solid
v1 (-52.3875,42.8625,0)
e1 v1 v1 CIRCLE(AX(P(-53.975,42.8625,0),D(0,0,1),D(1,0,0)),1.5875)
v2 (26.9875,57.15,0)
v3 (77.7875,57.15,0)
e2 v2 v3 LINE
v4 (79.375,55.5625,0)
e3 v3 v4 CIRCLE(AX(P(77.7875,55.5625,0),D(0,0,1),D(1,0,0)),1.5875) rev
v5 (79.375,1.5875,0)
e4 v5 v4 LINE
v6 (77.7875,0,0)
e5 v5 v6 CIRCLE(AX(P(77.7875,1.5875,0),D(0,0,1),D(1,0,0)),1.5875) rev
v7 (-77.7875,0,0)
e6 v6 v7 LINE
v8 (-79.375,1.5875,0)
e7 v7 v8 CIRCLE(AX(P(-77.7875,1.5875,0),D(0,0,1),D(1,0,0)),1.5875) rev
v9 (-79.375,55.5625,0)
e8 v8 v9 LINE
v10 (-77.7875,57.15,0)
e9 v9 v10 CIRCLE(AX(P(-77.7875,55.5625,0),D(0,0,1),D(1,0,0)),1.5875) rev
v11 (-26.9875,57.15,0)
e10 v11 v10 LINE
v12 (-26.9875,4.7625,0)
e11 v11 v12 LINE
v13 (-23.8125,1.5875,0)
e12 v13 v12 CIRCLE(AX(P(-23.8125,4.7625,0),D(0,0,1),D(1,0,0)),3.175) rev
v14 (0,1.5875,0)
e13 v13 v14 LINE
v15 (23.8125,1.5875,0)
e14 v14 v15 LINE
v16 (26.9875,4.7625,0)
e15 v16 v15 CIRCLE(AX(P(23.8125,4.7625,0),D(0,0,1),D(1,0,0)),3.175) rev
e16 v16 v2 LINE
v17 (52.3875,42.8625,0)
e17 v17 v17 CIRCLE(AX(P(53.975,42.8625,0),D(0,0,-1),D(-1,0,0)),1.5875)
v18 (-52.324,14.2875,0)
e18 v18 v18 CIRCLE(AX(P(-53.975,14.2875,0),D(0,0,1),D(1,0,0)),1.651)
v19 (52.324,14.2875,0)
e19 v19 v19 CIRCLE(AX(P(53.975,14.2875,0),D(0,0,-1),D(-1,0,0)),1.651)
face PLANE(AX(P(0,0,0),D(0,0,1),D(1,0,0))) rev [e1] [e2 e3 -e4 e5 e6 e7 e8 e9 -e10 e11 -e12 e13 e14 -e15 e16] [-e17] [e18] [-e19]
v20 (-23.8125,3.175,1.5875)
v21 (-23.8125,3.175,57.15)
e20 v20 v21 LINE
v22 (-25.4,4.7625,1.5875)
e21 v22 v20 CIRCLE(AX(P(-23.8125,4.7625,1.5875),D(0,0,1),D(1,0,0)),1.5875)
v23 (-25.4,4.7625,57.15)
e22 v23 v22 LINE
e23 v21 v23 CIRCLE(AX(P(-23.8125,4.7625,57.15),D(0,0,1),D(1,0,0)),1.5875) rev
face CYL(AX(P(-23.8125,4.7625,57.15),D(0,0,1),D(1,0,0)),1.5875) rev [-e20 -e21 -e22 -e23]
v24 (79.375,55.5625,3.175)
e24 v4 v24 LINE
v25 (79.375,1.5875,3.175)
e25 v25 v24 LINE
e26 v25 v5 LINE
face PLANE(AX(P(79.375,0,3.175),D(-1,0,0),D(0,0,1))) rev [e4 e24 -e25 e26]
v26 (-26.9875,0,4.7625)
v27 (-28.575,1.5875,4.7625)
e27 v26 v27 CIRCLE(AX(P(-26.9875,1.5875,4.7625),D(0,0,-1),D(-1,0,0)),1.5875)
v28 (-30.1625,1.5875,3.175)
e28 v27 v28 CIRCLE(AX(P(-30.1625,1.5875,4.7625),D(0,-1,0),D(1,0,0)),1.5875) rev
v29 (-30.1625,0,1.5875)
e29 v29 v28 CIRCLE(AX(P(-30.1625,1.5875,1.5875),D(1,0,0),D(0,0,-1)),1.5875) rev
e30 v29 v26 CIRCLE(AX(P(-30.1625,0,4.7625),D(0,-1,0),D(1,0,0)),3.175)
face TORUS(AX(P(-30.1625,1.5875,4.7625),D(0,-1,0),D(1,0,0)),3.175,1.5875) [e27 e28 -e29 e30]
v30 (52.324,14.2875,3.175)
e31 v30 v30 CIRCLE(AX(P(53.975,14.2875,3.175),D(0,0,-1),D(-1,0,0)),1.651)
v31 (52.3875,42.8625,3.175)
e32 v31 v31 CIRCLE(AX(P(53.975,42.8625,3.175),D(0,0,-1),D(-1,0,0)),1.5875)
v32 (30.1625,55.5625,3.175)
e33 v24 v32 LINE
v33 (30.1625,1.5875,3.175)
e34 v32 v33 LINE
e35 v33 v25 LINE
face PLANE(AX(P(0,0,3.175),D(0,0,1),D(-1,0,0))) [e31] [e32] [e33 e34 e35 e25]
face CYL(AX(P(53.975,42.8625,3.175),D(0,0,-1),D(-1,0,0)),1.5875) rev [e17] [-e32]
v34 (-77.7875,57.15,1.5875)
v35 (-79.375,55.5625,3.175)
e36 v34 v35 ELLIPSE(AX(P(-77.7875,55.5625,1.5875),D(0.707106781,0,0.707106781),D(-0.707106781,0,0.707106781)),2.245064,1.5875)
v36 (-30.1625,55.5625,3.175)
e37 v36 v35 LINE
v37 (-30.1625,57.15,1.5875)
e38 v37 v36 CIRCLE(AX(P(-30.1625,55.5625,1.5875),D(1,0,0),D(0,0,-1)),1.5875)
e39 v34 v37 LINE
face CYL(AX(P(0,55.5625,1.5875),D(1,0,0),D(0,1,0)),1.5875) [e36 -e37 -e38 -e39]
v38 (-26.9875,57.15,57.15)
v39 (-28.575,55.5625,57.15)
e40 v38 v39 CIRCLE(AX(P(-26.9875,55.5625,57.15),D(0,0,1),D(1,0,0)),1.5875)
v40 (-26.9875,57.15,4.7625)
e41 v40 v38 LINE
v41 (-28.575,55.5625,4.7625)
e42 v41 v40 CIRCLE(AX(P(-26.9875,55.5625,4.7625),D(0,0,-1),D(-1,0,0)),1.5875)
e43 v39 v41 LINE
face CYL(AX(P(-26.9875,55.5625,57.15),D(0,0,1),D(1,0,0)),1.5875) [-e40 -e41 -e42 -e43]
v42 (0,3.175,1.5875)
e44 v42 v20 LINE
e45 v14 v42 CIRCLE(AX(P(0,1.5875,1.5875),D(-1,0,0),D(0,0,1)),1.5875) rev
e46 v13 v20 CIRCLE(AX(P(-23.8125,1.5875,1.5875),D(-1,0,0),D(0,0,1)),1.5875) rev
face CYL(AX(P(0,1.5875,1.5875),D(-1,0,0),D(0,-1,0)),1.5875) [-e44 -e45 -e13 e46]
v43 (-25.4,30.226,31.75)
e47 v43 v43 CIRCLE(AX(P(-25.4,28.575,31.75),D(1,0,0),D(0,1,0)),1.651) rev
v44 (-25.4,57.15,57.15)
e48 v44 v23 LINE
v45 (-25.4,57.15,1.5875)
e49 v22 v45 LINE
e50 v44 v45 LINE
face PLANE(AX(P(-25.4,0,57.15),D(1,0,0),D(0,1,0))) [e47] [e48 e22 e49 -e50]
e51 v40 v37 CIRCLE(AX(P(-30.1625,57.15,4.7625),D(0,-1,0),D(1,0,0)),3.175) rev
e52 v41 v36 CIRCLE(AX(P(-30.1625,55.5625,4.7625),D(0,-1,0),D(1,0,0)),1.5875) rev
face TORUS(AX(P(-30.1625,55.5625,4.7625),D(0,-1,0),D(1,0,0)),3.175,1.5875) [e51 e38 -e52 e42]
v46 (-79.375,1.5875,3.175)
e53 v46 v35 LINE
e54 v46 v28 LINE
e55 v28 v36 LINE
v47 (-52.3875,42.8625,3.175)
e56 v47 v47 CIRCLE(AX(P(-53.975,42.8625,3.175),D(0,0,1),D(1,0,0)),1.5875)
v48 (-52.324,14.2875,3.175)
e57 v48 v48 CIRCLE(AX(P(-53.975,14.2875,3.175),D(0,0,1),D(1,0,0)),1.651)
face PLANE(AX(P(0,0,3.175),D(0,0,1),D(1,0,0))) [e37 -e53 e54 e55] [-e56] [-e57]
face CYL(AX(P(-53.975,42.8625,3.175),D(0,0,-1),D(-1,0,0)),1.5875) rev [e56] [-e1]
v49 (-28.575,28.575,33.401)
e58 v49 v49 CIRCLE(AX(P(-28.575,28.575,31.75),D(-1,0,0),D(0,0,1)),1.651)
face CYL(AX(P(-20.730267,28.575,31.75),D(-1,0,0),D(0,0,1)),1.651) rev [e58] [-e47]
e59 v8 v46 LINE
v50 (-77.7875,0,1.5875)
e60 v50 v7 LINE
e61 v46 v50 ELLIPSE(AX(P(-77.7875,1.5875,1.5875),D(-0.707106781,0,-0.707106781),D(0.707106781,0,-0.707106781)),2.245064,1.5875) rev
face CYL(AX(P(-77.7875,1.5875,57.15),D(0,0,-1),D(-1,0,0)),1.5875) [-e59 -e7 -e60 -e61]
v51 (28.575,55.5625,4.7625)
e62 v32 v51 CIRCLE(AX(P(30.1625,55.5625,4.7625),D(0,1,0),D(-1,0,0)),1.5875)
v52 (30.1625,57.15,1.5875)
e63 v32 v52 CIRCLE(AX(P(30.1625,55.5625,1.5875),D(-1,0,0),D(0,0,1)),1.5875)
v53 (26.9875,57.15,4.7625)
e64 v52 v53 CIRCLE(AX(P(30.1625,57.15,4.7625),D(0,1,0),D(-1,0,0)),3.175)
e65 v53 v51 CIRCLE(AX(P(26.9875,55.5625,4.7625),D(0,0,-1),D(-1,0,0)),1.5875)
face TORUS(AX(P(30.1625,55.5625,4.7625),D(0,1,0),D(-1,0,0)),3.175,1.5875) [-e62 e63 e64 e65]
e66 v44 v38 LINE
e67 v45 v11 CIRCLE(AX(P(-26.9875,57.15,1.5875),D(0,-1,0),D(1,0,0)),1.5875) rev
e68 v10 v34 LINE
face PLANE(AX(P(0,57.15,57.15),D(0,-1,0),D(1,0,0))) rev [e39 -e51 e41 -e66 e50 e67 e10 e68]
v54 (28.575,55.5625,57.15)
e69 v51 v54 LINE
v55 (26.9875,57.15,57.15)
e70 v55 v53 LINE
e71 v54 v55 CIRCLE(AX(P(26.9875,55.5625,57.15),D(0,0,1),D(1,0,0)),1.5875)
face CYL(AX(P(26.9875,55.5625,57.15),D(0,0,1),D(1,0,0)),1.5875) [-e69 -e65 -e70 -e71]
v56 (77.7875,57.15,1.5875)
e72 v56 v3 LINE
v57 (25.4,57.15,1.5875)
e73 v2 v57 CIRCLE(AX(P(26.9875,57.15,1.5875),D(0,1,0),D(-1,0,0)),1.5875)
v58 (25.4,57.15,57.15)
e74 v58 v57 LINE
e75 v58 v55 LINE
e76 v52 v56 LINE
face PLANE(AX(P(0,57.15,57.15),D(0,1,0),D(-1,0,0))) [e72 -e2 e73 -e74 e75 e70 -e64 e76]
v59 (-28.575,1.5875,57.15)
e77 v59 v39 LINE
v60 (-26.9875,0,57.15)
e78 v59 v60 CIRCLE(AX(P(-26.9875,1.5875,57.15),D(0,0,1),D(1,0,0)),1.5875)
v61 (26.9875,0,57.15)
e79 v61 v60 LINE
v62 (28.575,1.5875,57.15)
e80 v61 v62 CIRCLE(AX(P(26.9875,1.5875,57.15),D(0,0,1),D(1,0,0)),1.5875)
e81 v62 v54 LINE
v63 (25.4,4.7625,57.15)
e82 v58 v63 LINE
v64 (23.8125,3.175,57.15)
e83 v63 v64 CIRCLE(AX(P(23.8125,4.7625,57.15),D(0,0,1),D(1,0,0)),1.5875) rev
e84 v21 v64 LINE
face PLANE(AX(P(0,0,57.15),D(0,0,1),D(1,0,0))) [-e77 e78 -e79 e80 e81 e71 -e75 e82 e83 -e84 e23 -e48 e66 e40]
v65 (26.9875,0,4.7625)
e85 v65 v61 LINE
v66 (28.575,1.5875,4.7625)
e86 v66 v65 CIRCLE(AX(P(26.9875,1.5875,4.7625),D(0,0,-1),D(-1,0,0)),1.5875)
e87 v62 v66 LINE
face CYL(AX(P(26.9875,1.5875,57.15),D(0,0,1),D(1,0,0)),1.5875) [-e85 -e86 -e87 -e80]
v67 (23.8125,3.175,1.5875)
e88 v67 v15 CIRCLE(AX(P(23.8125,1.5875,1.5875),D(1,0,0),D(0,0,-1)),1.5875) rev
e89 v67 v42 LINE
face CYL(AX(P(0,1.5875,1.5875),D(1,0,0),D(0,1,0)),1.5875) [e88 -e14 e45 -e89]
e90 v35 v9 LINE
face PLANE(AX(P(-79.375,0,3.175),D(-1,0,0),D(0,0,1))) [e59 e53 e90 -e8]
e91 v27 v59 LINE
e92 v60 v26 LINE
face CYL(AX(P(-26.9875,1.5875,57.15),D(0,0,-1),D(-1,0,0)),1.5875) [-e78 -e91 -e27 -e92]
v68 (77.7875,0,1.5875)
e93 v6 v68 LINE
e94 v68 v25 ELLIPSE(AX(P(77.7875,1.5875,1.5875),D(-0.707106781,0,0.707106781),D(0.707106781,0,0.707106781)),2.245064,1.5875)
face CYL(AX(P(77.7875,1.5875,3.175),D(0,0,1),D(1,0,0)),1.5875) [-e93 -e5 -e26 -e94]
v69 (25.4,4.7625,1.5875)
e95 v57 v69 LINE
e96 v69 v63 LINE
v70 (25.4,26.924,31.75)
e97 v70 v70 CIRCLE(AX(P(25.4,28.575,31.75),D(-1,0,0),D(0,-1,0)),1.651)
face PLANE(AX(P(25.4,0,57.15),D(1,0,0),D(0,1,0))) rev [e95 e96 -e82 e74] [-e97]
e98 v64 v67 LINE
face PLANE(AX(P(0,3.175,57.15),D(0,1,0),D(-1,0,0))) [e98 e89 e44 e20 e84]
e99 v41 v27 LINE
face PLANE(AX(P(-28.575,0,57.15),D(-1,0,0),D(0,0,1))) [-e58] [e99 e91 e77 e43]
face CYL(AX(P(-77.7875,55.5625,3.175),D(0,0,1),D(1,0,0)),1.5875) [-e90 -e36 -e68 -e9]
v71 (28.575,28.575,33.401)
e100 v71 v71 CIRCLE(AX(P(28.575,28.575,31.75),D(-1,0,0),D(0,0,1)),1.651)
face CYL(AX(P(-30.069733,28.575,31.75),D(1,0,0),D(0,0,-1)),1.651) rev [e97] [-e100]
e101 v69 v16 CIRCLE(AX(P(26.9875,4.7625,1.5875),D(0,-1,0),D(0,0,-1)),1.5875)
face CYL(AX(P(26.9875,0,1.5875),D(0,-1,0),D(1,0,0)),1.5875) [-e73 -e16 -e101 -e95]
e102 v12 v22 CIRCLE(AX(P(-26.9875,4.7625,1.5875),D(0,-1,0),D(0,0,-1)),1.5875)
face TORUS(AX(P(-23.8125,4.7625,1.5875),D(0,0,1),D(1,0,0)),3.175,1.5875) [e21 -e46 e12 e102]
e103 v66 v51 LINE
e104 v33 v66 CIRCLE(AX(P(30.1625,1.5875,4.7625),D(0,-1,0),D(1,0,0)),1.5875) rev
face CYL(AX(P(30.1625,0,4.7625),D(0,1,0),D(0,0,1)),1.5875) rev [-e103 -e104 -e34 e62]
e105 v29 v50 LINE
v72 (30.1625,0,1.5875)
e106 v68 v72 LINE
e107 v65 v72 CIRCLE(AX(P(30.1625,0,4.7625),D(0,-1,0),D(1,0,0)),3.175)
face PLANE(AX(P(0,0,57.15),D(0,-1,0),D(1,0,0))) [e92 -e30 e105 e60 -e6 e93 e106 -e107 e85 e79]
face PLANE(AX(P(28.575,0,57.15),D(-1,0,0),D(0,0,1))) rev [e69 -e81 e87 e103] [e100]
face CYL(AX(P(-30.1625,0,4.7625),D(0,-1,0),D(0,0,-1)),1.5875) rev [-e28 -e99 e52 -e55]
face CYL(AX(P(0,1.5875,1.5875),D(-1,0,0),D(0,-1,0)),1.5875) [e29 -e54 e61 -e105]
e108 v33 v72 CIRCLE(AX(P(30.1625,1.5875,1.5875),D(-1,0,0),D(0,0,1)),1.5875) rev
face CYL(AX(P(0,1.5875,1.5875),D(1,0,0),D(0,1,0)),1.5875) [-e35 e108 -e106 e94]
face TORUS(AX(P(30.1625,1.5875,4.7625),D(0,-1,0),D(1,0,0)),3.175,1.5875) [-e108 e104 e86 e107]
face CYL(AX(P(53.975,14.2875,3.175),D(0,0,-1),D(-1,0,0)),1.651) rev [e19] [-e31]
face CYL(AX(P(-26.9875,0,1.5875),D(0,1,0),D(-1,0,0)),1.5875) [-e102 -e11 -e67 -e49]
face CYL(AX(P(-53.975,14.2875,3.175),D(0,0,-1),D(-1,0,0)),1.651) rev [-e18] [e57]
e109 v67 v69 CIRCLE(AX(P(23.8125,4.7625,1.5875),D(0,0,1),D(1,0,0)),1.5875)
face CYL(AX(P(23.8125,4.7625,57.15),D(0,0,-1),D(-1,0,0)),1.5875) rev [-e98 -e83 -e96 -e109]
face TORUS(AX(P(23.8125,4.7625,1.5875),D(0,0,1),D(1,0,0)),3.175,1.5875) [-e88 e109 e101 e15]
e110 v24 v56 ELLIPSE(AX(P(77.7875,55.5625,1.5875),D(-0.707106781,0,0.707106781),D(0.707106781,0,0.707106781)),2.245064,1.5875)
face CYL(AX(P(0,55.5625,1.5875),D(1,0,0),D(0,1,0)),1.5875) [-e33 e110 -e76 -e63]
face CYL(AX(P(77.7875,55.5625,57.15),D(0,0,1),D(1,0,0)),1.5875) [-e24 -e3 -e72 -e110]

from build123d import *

# Parameters (mm, degrees)
BOSS_EXTRUDE1_DEPTH  = 57.15
SKETCH1_3_W          = 50.8
SKETCH1_3_H          = 57.15
SKETCH1_3_R          = 1.651
SKETCH1_3_R_2        = 1.5875
BOSS_EXTRUDE2_DEPTH  = 3.175
SKETCH2_R            = 1.651
CUT_EXTRUDE1_DEPTH   = 3.175
FILLET1_R            = 1.5875
FILLET1_OF_MIRROR1_R = 1.5875


with BuildPart() as part:
    # Sketch1 → Boss-Extrude1 (new body)
    with BuildSketch(Plane.XY):
        Polygon((-28.575, 0), (0, 0), (0, 3.175), (-25.4, 3.175), (-25.4, 53.975), (-25.4, 57.15), (-28.575, 57.15), align=None)
    boss_extrude1 = extrude(amount=BOSS_EXTRUDE1_DEPTH)

    # Sketch1<3> → Boss-Extrude2 (add)
    with BuildSketch(Plane.XY):
        with Locations((-53.975, 28.575)):
            Rectangle(SKETCH1_3_W, SKETCH1_3_H)
        with Locations((-53.975, 14.2875)):
            Circle(SKETCH1_3_R, mode=Mode.SUBTRACT)
        with Locations((-53.975, 42.8625)):
            Circle(SKETCH1_3_R_2, mode=Mode.SUBTRACT)
    boss_extrude2 = extrude(amount=BOSS_EXTRUDE2_DEPTH)

    # Sketch2 → Cut-Extrude1 (cut)
    with BuildSketch(Plane.ZY.offset(28.575)):
        with Locations((31.75, 28.575)):
            Circle(SKETCH2_R)
    cut_extrude1 = extrude(amount=-CUT_EXTRUDE1_DEPTH, mode=Mode.SUBTRACT)

    # Fillet1
    fillet1_edges = [part.edges().sort_by_distance(p)[0] for p in [
        (-25.4, 30.1625, 0),
        (-25.4, 3.175, 28.575),
        (-28.575, 0, 30.1625),
        (-28.575, 57.15, 30.1625),
        (-53.975, 0, 3.175),
        (-79.375, 0, 1.5875),
        (-79.375, 57.15, 1.5875),
        (-28.575, 28.575, 3.175),
        (-53.975, 57.15, 3.175),
        (-12.7, 3.175, 0),
    ]]
    fillet(fillet1_edges, radius=FILLET1_R - 0.0001)  # a hair under: the kernel refuses the full size

    # Mirror1: Boss-Extrude1, Boss-Extrude2, Cut-Extrude1 across plane
    add(boss_extrude1.mirror(Plane(origin=(0, 0, 0), x_dir=(0, 0, 1), z_dir=(1, 0, 0))))
    add(boss_extrude2.mirror(Plane(origin=(0, 0, 0), x_dir=(0, 0, 1), z_dir=(1, 0, 0))))
    add(cut_extrude1.mirror(Plane(origin=(0, 0, 0), x_dir=(0, 0, 1), z_dir=(1, 0, 0))), mode=Mode.SUBTRACT)

    # Fillet1 of Mirror1
    fillet1_of_mirror1_edges = [part.edges().sort_by_distance(p)[0] for p in [
        (25.4, 30.1625, 0),
        (25.4, 3.175, 28.575),
        (28.575, 0, 30.1625),
        (28.575, 57.15, 30.1625),
        (53.975, 0, 3.175),
        (79.375, 0, 1.5875),
        (79.375, 57.15, 1.5875),
        (28.575, 28.575, 3.175),
        (53.975, 57.15, 3.175),
        (12.7, 3.175, 0),
    ]]
    fillet(fillet1_of_mirror1_edges, radius=FILLET1_OF_MIRROR1_R - 0.0001)  # a hair under: the kernel refuses the full size


solid = part.part
